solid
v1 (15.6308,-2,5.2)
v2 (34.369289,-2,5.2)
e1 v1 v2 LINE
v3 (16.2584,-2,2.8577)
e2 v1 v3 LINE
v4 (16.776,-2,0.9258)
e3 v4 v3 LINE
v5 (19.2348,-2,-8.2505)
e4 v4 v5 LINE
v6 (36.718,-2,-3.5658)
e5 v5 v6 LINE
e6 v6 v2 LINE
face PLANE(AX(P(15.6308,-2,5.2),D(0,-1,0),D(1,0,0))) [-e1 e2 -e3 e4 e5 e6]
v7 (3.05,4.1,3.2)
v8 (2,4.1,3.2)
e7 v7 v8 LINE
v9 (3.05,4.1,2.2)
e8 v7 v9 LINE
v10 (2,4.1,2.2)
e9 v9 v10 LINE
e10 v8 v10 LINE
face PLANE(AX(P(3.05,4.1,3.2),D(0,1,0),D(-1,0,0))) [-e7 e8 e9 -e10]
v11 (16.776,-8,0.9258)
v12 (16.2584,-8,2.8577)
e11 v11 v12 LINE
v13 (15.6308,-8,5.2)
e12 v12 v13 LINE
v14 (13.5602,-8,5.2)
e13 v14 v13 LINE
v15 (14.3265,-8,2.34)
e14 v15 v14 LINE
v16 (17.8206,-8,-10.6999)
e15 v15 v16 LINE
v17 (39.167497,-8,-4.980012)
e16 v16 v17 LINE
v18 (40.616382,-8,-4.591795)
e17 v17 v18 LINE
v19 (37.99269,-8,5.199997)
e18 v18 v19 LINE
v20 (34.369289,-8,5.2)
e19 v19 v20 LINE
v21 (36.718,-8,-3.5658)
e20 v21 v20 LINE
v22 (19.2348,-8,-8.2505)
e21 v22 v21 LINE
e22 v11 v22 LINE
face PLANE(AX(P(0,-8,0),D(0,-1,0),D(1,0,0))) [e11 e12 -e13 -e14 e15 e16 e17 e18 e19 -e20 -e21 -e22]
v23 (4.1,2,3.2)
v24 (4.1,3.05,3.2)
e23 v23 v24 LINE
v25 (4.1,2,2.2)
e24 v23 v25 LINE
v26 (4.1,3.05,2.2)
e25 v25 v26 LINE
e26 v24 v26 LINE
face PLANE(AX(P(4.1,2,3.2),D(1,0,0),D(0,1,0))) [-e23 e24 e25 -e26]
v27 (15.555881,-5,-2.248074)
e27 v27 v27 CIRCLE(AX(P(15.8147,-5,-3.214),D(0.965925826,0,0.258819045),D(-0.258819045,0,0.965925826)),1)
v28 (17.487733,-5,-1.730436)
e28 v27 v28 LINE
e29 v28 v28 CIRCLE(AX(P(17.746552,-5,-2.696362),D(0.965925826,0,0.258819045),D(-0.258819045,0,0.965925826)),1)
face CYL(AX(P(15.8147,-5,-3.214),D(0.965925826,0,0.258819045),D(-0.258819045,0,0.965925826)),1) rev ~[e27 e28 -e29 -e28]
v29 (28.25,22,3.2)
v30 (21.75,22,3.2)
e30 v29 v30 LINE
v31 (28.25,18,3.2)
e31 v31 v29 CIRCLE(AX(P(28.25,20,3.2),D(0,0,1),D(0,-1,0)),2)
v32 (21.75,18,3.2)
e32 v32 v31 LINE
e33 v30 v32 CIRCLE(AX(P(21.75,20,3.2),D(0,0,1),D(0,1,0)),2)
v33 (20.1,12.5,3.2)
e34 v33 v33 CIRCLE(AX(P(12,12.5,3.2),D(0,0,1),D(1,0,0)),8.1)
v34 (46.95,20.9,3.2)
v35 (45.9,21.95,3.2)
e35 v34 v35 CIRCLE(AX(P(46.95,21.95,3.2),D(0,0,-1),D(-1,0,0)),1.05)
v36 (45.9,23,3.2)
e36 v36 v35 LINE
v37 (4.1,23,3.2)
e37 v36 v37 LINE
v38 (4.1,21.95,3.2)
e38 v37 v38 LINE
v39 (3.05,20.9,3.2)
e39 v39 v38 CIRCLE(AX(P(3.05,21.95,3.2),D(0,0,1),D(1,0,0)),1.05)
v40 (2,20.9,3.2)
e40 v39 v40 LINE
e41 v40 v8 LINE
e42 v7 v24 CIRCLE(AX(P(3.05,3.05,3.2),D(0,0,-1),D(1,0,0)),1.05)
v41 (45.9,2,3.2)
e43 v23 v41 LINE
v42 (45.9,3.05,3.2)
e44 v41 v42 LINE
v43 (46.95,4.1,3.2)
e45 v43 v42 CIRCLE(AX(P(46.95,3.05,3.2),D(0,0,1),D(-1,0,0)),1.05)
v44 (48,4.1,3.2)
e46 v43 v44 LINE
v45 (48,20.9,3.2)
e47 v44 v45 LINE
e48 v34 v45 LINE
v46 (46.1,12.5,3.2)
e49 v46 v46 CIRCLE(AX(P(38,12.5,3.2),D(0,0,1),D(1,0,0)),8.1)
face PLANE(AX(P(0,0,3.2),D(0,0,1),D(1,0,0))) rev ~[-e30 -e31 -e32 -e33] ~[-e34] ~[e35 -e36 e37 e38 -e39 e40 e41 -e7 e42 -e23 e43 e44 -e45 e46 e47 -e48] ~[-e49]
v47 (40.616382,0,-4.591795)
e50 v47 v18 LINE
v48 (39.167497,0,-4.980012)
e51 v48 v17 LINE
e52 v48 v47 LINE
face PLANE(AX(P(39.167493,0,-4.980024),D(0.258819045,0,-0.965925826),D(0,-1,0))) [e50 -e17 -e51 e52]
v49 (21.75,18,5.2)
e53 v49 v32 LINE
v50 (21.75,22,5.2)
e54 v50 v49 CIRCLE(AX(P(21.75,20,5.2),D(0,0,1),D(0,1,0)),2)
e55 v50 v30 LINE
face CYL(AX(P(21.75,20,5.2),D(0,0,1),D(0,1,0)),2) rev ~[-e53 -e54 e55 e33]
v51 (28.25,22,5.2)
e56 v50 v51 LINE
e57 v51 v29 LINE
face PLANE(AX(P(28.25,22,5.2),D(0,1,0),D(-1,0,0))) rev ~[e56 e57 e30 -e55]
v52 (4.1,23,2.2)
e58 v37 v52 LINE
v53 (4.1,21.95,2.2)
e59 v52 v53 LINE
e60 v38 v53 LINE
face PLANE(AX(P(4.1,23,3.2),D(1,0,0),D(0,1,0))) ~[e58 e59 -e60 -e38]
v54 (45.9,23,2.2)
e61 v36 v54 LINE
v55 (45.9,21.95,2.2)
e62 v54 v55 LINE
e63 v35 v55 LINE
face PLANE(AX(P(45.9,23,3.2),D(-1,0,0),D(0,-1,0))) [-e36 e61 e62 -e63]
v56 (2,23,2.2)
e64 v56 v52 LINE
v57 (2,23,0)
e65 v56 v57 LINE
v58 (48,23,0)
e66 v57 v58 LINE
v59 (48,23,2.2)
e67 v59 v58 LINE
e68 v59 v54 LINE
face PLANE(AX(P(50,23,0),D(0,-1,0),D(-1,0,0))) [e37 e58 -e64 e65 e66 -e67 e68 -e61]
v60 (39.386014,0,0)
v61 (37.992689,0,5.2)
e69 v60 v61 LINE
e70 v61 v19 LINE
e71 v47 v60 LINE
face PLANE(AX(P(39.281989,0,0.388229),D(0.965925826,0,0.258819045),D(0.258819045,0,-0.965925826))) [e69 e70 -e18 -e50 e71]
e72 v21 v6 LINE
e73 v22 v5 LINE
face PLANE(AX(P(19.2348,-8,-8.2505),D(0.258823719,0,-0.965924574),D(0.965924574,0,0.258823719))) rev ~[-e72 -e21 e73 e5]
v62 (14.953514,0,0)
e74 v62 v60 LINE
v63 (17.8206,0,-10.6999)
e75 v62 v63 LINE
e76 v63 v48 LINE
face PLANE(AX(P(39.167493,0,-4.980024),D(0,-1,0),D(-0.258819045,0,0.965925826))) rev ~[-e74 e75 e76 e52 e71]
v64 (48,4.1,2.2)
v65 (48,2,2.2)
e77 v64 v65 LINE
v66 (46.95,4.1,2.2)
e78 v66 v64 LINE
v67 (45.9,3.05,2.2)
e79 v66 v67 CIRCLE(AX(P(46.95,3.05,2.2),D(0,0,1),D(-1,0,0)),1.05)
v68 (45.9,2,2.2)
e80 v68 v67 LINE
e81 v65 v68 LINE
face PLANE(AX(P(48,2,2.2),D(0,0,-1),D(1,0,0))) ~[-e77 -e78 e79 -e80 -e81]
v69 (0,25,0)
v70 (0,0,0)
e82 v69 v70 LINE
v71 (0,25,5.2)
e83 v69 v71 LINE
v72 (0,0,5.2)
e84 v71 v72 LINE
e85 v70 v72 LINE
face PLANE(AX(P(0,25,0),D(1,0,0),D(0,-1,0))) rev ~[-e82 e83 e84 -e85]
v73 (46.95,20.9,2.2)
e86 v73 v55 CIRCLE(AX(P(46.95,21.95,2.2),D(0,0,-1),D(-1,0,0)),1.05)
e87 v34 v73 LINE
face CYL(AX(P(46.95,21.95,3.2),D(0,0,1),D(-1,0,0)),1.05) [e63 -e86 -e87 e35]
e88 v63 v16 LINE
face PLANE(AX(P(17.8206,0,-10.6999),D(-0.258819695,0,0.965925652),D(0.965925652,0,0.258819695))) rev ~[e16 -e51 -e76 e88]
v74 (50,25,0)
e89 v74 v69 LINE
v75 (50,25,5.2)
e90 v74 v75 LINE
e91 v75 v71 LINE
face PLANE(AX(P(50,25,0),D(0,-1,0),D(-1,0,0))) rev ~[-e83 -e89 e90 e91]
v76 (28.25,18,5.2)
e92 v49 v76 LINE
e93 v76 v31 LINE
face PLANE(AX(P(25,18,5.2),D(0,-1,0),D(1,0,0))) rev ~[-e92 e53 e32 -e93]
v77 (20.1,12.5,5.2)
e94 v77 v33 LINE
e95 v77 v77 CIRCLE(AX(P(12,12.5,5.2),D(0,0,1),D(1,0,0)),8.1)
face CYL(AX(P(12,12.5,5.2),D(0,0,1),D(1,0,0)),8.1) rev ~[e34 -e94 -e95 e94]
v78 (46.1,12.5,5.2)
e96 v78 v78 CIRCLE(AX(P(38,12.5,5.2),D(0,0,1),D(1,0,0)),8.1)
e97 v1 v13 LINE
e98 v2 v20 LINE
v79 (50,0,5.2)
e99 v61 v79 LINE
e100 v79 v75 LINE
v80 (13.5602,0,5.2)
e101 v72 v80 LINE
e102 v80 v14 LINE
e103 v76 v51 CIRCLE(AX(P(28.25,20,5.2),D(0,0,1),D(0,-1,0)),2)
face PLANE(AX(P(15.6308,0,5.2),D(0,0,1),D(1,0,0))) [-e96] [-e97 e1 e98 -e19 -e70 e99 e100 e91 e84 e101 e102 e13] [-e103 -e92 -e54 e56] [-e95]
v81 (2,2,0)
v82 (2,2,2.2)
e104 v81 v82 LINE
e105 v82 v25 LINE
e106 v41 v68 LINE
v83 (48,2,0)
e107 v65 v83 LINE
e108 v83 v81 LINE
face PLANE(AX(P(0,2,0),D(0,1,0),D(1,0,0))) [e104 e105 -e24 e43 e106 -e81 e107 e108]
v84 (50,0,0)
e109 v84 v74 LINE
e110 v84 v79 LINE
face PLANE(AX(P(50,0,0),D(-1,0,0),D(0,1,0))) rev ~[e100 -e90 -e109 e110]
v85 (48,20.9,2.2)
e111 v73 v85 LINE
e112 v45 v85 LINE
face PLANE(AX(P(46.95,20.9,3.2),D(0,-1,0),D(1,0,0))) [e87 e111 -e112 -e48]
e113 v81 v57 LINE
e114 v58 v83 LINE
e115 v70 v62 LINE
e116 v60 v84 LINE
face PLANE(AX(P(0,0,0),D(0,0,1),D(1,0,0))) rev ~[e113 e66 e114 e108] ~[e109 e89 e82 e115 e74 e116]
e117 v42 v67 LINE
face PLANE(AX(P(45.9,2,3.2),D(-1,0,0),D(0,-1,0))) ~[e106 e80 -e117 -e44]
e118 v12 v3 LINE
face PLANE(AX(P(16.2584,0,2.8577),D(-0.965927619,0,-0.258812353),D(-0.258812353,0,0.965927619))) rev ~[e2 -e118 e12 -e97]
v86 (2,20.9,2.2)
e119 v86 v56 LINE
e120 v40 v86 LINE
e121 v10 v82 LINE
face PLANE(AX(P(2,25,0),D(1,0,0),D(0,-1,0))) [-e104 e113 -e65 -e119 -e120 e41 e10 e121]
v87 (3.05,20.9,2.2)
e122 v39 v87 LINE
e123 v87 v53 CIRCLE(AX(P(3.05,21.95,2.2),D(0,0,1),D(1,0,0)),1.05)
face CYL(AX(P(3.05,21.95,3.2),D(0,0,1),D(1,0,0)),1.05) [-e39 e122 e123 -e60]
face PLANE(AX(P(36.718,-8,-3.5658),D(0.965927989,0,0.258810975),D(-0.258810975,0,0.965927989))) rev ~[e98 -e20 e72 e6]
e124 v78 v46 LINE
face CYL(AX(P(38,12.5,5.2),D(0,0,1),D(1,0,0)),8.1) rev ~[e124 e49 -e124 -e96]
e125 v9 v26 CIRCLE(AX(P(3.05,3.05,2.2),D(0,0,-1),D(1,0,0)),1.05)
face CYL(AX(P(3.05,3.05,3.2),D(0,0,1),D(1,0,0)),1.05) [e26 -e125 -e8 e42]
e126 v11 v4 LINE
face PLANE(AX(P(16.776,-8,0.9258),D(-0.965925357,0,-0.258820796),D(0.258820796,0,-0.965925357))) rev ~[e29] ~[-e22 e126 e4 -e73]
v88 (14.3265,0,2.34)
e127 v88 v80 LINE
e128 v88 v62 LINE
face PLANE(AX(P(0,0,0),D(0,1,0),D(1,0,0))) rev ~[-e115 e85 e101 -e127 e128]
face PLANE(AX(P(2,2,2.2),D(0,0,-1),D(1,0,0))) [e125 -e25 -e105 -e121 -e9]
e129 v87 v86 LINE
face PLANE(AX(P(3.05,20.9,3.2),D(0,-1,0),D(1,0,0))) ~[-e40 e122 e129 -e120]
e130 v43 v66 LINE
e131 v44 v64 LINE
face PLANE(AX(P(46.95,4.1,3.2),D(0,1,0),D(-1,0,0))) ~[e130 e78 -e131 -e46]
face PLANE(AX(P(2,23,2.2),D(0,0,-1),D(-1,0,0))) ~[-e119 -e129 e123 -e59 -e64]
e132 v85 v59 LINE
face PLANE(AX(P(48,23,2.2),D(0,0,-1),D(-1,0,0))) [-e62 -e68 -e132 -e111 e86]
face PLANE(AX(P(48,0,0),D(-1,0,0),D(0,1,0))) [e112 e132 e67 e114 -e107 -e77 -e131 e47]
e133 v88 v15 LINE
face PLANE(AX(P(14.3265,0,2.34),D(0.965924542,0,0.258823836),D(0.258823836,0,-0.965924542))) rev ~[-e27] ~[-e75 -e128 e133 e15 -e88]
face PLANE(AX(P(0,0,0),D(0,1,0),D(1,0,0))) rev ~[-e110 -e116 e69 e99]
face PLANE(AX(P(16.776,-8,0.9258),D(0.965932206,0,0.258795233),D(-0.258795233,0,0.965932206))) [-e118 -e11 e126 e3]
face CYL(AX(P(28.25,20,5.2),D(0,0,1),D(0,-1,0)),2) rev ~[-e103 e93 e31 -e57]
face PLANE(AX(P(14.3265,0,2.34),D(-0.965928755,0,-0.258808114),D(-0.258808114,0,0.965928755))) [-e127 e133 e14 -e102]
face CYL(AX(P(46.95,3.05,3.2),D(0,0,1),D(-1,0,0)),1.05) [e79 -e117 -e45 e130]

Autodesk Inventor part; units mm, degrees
ref_plane "YZ Plane" through (0, 0, 0) normal (1, 0, 0) x (0, 1, 0)
sketch "Эскиз1" plane through (0, 0, 0) normal (0, 0, 1) x (1, 0, 0)
  line L0 (0, 0) -> (50, 0)
  line L1 (50, 0) -> (50, 25)
  line L2 (50, 25) -> (0, 25)
  line L3 (0, 25) -> (0, 0)
  dimension "d0" = 50
  dimension "d1" = 25
extrude "Выдавливание1" add sketch "Эскиз1" along normal blind 5.2
shell "Оболочка1" thickness 2 removed faces 1 at (16.6667, 16.6667, 0)
sketch "Эскиз2" plane through (0, 0, 5.2) normal (0, 0, 1) x (1, 0, 0)
  line L0 (50, 25) -> (0, 25) projected
  line L1 (25, 25) -> (25, 0)
  line L2 (0, 0) -> (50, 0) projected
  line L3 (25, 12.5) -> (12, 12.5)
  line L4 (0, 25) -> (0, 0) projected
  circle A0 centre (12, 12.5) radius 8.1
  circle A1 centre (38, 12.5) radius 8.1
  line L5 (25, 25) -> (25, 20)
  line L6 (21.75, 20) -> (28.25, 20) construction
  line L7 (21.75, 18) -> (28.25, 18)
  line L8 (28.25, 22) -> (21.75, 22)
  arc A2 (21.75, 22) -> (21.75, 18) centre (21.75, 20) ccw
  arc A3 (28.25, 18) -> (28.25, 22) centre (28.25, 20) ccw
  point P0 (25, 18)
  point P1 (25, 22)
  dimension "d5" = 13
  dimension "d6" = 16.2
  dimension "d9" = 5
  dimension "d10" = 3.25
  dimension "d11" = 4
extrude "Выдавливание2" cut sketch "Эскиз2" against normal through all contours L8 A3 L7 L1 | L1 L7 A2 L8 | A0 | A1
sketch "Эскиз5" plane through (48, 23, 3.2) normal (0, 0, -1) x (-1, 0, 0)
  line L0 (0, 0) -> (1.05, 0)
  line L1 (0, 0) -> (46, 0) projected
  line L2 (1.05, 0) -> (1.05, -1.05)
  circle A0 centre (1.05, -1.05) radius 1.05
  line L3 (2.1, -2.1) -> (0, -2.1)
  line L4 (0, -2.1) -> (0, 0)
  line L5 (0, 0) -> (2.1, 0)
  line L6 (2.1, 0) -> (2.1, -2.1)
  line L7 (2.1, -2.1) -> (0, 0) construction
  line L8 (0, -2.1) -> (2.1, 0) construction
  point P0 (48, -23)
  point P1 (1.05, -2.1)
  point P2 (2.1, -1.05)
  dimension "d17" = 1.05
  dimension "d18" = 1.05
extrude "Выдавливание4" add sketch "Эскиз5" along normal blind 1 contours L0 A0 L4 | L1 L6 A0 | A0 | A0 L3 L4
ref_plane "РабПлоскость1" through (25, 2, 0) normal (1, 0, 0) x (0, 0, -1)
ref_plane "РабПлоскость2" through (2, 12.5, 0) normal (0, -1, 0) x (1, 0, 0)
mirror "Зеркальное отражение1" about plane through (2, 12.5, 0) normal (0, -1, 0) of "Выдавливание4"
mirror "Зеркальное отражение2" about plane through (25, 2, 0) normal (1, 0, 0) of "Выдавливание4", "Зеркальное отражение1"
sketch "Эскиз14" plane through (0, 0, 0) normal (0, -1, 0) x (1, 0, 0)
  line L0 (35.6735, 8.06) -> (14.3265, 2.34)
  line L1 (14.3265, 2.34) -> (17.8206, -10.6999)
  line L2 (17.8206, -10.6999) -> (39.1675, -4.98)
  line L3 (39.1675, -4.98) -> (35.6735, 8.06)
  line L4 (35.6735, 8.06) -> (17.8206, -10.6999) construction
  line L5 (14.3265, 2.34) -> (39.1675, -4.98) construction
  line L6 (0, 5.2) -> (50, 5.2) projected
  point P0 (0, 0)
  point P1 (26.747, -1.32)
  point P2 (25, 5.2)
  dimension "d67" = 13.5
  dimension "d68" = 22.1
  dimension "d77" = 15
extrude "Выдавливание10" add sketch "Эскиз14" along normal blind 8
sketch "Эскиз15" plane through (0, -8, 0) normal (0, -1, 0) x (1, 0, 0)
  line L0 (17.8206, -10.6999) -> (39.1675, -4.98) projected
  line L1 (19.2348, -8.2505) -> (36.718, -3.5658)
  line L2 (36.718, -3.5658) -> (34.2593, 5.6105)
  line L3 (34.2593, 5.6105) -> (16.776, 0.9258)
  line L4 (16.776, 0.9258) -> (19.2348, -8.2505)
  line L5 (39.1675, -4.98) -> (35.6735, 8.06) projected
  line L6 (17.8206, -10.6999) -> (39.1675, -4.98) projected
  line L7 (35.6735, 8.06) -> (14.3265, 2.34) projected
  line L8 (39.1675, -4.98) -> (14.3265, 2.34) construction
  line L9 (17.8206, -10.6999) -> (35.6735, 8.06) construction
  line L10 (19.2348, -8.2505) -> (34.2593, 5.6105) construction
  line L11 (16.776, 0.9258) -> (36.718, -3.5658) construction
  line L12 (34.2593, 5.6105) -> (33.7416, 7.5423)
  line L13 (16.776, 0.9258) -> (16.2584, 2.8577)
  point P0 (0, 0)
  point P1 (26.747, -1.32)
  dimension "d78" = 2
  dimension "d79" = 2
extrude "Выдавливание11" cut sketch "Эскиз15" against normal blind 6
sketch "Эскиз16" plane through (37.8331, 0, 0) normal (0.9659258, 0, 0.258819) x (0.258819, 0, -0.9659258)
  line L0 (5.1557, 0) -> (0, 0) projected
  line L1 (-5.3834, 0) -> (0, 0) projected
  line L2 (-8.3443, 0) -> (-8.3443, -8) projected
  line L3 (5.1557, -8) -> (-8.3443, -8) projected
  line L4 (5.1557, 0) -> (5.1557, -8) projected
  line L5 (-5.3834, 0) -> (-8.3443, 0) projected
  point P0 (-9.7919, 0)
extrude "Выдавливание12" add sketch "Эскиз16" along normal blind 1.5
sketch "Эскиз17" plane through (17.8206, -8, -10.6999) normal (-0.9659258, 0, -0.258819) x (-0.258819, 0, 0.9659258)
  line L0 (2, 0) -> (13.5, 0) projected
  line L1 (2, 0) -> (2, 6) projected
  line L2 (2, 6) -> (13.5, 6) projected
  line L3 (13.5, 0) -> (13.5, 6) projected
  line L4 (7.75, 6) -> (7.75, 0)
  line L5 (13.5, 0) -> (0, 0) projected
  point P0 (14.9477, 8)
  point P1 (7.75, 3)
hole "Отверстие4" at (15.8147, -5, -3.214) direction (0.9659258, 0, 0.258819) diameter 2 depth 2
sketch "Эскиз18" plane through (0, 0, 0) normal (0, 1, 0) x (1, 0, 0)
  line L0 (25, -5.2) -> (37.9927, -5.2) projected
  line L1 (25, -5.2) -> (37.1224, -8.4482) projected
  line L2 (37.9927, -5.2) -> (37.1224, -8.4482) projected
  point P0 (0, 0)
extrude "Выдавливание13" cut sketch "Эскиз18" against normal through all
sketch "Эскиз19" plane through (0, 0, 0) normal (0, -1, 0) x (1, 0, 0)
  line L0 (14.3265, 2.34) -> (25, 5.2) projected
  line L1 (14.3265, 2.34) -> (13.5602, 5.2)
  line L2 (0, 5.2) -> (25, 5.2) projected
  line L3 (14.3265, 2.34) -> (17.8206, -10.6999) projected
  line L4 (16.2584, 2.8577) -> (14.3265, 2.34) projected
  line L5 (16.2584, 2.8577) -> (15.6308, 5.2)
  line L6 (50, 5.2) -> (0, 5.2) projected
  line L7 (19.2348, -8.2505) -> (16.2584, 2.8577) projected
  point P0 (0, 0)
extrude "Выдавливание14" add sketch "Эскиз19" along normal up to surface (8 mm away) contours L1 L2 L5 L0
sketch "Эскиз21" plane through (15.6308, 0, 5.2) normal (0, -1, 0) x (1, 0, 0)
  line L0 (0, 0) -> (0.6276, -2.3423) projected
  line L1 (0.6276, -2.3423) -> (9.3692, 0) projected
  line L2 (0, 0) -> (9.3692, 0) projected
  point P0 (-15.6308, -5.2)
extrude "Выдавливание15" add sketch "Эскиз21" along normal up to surface (2 mm away)
properties part number "Крепление ультрасоника вертикальная"
